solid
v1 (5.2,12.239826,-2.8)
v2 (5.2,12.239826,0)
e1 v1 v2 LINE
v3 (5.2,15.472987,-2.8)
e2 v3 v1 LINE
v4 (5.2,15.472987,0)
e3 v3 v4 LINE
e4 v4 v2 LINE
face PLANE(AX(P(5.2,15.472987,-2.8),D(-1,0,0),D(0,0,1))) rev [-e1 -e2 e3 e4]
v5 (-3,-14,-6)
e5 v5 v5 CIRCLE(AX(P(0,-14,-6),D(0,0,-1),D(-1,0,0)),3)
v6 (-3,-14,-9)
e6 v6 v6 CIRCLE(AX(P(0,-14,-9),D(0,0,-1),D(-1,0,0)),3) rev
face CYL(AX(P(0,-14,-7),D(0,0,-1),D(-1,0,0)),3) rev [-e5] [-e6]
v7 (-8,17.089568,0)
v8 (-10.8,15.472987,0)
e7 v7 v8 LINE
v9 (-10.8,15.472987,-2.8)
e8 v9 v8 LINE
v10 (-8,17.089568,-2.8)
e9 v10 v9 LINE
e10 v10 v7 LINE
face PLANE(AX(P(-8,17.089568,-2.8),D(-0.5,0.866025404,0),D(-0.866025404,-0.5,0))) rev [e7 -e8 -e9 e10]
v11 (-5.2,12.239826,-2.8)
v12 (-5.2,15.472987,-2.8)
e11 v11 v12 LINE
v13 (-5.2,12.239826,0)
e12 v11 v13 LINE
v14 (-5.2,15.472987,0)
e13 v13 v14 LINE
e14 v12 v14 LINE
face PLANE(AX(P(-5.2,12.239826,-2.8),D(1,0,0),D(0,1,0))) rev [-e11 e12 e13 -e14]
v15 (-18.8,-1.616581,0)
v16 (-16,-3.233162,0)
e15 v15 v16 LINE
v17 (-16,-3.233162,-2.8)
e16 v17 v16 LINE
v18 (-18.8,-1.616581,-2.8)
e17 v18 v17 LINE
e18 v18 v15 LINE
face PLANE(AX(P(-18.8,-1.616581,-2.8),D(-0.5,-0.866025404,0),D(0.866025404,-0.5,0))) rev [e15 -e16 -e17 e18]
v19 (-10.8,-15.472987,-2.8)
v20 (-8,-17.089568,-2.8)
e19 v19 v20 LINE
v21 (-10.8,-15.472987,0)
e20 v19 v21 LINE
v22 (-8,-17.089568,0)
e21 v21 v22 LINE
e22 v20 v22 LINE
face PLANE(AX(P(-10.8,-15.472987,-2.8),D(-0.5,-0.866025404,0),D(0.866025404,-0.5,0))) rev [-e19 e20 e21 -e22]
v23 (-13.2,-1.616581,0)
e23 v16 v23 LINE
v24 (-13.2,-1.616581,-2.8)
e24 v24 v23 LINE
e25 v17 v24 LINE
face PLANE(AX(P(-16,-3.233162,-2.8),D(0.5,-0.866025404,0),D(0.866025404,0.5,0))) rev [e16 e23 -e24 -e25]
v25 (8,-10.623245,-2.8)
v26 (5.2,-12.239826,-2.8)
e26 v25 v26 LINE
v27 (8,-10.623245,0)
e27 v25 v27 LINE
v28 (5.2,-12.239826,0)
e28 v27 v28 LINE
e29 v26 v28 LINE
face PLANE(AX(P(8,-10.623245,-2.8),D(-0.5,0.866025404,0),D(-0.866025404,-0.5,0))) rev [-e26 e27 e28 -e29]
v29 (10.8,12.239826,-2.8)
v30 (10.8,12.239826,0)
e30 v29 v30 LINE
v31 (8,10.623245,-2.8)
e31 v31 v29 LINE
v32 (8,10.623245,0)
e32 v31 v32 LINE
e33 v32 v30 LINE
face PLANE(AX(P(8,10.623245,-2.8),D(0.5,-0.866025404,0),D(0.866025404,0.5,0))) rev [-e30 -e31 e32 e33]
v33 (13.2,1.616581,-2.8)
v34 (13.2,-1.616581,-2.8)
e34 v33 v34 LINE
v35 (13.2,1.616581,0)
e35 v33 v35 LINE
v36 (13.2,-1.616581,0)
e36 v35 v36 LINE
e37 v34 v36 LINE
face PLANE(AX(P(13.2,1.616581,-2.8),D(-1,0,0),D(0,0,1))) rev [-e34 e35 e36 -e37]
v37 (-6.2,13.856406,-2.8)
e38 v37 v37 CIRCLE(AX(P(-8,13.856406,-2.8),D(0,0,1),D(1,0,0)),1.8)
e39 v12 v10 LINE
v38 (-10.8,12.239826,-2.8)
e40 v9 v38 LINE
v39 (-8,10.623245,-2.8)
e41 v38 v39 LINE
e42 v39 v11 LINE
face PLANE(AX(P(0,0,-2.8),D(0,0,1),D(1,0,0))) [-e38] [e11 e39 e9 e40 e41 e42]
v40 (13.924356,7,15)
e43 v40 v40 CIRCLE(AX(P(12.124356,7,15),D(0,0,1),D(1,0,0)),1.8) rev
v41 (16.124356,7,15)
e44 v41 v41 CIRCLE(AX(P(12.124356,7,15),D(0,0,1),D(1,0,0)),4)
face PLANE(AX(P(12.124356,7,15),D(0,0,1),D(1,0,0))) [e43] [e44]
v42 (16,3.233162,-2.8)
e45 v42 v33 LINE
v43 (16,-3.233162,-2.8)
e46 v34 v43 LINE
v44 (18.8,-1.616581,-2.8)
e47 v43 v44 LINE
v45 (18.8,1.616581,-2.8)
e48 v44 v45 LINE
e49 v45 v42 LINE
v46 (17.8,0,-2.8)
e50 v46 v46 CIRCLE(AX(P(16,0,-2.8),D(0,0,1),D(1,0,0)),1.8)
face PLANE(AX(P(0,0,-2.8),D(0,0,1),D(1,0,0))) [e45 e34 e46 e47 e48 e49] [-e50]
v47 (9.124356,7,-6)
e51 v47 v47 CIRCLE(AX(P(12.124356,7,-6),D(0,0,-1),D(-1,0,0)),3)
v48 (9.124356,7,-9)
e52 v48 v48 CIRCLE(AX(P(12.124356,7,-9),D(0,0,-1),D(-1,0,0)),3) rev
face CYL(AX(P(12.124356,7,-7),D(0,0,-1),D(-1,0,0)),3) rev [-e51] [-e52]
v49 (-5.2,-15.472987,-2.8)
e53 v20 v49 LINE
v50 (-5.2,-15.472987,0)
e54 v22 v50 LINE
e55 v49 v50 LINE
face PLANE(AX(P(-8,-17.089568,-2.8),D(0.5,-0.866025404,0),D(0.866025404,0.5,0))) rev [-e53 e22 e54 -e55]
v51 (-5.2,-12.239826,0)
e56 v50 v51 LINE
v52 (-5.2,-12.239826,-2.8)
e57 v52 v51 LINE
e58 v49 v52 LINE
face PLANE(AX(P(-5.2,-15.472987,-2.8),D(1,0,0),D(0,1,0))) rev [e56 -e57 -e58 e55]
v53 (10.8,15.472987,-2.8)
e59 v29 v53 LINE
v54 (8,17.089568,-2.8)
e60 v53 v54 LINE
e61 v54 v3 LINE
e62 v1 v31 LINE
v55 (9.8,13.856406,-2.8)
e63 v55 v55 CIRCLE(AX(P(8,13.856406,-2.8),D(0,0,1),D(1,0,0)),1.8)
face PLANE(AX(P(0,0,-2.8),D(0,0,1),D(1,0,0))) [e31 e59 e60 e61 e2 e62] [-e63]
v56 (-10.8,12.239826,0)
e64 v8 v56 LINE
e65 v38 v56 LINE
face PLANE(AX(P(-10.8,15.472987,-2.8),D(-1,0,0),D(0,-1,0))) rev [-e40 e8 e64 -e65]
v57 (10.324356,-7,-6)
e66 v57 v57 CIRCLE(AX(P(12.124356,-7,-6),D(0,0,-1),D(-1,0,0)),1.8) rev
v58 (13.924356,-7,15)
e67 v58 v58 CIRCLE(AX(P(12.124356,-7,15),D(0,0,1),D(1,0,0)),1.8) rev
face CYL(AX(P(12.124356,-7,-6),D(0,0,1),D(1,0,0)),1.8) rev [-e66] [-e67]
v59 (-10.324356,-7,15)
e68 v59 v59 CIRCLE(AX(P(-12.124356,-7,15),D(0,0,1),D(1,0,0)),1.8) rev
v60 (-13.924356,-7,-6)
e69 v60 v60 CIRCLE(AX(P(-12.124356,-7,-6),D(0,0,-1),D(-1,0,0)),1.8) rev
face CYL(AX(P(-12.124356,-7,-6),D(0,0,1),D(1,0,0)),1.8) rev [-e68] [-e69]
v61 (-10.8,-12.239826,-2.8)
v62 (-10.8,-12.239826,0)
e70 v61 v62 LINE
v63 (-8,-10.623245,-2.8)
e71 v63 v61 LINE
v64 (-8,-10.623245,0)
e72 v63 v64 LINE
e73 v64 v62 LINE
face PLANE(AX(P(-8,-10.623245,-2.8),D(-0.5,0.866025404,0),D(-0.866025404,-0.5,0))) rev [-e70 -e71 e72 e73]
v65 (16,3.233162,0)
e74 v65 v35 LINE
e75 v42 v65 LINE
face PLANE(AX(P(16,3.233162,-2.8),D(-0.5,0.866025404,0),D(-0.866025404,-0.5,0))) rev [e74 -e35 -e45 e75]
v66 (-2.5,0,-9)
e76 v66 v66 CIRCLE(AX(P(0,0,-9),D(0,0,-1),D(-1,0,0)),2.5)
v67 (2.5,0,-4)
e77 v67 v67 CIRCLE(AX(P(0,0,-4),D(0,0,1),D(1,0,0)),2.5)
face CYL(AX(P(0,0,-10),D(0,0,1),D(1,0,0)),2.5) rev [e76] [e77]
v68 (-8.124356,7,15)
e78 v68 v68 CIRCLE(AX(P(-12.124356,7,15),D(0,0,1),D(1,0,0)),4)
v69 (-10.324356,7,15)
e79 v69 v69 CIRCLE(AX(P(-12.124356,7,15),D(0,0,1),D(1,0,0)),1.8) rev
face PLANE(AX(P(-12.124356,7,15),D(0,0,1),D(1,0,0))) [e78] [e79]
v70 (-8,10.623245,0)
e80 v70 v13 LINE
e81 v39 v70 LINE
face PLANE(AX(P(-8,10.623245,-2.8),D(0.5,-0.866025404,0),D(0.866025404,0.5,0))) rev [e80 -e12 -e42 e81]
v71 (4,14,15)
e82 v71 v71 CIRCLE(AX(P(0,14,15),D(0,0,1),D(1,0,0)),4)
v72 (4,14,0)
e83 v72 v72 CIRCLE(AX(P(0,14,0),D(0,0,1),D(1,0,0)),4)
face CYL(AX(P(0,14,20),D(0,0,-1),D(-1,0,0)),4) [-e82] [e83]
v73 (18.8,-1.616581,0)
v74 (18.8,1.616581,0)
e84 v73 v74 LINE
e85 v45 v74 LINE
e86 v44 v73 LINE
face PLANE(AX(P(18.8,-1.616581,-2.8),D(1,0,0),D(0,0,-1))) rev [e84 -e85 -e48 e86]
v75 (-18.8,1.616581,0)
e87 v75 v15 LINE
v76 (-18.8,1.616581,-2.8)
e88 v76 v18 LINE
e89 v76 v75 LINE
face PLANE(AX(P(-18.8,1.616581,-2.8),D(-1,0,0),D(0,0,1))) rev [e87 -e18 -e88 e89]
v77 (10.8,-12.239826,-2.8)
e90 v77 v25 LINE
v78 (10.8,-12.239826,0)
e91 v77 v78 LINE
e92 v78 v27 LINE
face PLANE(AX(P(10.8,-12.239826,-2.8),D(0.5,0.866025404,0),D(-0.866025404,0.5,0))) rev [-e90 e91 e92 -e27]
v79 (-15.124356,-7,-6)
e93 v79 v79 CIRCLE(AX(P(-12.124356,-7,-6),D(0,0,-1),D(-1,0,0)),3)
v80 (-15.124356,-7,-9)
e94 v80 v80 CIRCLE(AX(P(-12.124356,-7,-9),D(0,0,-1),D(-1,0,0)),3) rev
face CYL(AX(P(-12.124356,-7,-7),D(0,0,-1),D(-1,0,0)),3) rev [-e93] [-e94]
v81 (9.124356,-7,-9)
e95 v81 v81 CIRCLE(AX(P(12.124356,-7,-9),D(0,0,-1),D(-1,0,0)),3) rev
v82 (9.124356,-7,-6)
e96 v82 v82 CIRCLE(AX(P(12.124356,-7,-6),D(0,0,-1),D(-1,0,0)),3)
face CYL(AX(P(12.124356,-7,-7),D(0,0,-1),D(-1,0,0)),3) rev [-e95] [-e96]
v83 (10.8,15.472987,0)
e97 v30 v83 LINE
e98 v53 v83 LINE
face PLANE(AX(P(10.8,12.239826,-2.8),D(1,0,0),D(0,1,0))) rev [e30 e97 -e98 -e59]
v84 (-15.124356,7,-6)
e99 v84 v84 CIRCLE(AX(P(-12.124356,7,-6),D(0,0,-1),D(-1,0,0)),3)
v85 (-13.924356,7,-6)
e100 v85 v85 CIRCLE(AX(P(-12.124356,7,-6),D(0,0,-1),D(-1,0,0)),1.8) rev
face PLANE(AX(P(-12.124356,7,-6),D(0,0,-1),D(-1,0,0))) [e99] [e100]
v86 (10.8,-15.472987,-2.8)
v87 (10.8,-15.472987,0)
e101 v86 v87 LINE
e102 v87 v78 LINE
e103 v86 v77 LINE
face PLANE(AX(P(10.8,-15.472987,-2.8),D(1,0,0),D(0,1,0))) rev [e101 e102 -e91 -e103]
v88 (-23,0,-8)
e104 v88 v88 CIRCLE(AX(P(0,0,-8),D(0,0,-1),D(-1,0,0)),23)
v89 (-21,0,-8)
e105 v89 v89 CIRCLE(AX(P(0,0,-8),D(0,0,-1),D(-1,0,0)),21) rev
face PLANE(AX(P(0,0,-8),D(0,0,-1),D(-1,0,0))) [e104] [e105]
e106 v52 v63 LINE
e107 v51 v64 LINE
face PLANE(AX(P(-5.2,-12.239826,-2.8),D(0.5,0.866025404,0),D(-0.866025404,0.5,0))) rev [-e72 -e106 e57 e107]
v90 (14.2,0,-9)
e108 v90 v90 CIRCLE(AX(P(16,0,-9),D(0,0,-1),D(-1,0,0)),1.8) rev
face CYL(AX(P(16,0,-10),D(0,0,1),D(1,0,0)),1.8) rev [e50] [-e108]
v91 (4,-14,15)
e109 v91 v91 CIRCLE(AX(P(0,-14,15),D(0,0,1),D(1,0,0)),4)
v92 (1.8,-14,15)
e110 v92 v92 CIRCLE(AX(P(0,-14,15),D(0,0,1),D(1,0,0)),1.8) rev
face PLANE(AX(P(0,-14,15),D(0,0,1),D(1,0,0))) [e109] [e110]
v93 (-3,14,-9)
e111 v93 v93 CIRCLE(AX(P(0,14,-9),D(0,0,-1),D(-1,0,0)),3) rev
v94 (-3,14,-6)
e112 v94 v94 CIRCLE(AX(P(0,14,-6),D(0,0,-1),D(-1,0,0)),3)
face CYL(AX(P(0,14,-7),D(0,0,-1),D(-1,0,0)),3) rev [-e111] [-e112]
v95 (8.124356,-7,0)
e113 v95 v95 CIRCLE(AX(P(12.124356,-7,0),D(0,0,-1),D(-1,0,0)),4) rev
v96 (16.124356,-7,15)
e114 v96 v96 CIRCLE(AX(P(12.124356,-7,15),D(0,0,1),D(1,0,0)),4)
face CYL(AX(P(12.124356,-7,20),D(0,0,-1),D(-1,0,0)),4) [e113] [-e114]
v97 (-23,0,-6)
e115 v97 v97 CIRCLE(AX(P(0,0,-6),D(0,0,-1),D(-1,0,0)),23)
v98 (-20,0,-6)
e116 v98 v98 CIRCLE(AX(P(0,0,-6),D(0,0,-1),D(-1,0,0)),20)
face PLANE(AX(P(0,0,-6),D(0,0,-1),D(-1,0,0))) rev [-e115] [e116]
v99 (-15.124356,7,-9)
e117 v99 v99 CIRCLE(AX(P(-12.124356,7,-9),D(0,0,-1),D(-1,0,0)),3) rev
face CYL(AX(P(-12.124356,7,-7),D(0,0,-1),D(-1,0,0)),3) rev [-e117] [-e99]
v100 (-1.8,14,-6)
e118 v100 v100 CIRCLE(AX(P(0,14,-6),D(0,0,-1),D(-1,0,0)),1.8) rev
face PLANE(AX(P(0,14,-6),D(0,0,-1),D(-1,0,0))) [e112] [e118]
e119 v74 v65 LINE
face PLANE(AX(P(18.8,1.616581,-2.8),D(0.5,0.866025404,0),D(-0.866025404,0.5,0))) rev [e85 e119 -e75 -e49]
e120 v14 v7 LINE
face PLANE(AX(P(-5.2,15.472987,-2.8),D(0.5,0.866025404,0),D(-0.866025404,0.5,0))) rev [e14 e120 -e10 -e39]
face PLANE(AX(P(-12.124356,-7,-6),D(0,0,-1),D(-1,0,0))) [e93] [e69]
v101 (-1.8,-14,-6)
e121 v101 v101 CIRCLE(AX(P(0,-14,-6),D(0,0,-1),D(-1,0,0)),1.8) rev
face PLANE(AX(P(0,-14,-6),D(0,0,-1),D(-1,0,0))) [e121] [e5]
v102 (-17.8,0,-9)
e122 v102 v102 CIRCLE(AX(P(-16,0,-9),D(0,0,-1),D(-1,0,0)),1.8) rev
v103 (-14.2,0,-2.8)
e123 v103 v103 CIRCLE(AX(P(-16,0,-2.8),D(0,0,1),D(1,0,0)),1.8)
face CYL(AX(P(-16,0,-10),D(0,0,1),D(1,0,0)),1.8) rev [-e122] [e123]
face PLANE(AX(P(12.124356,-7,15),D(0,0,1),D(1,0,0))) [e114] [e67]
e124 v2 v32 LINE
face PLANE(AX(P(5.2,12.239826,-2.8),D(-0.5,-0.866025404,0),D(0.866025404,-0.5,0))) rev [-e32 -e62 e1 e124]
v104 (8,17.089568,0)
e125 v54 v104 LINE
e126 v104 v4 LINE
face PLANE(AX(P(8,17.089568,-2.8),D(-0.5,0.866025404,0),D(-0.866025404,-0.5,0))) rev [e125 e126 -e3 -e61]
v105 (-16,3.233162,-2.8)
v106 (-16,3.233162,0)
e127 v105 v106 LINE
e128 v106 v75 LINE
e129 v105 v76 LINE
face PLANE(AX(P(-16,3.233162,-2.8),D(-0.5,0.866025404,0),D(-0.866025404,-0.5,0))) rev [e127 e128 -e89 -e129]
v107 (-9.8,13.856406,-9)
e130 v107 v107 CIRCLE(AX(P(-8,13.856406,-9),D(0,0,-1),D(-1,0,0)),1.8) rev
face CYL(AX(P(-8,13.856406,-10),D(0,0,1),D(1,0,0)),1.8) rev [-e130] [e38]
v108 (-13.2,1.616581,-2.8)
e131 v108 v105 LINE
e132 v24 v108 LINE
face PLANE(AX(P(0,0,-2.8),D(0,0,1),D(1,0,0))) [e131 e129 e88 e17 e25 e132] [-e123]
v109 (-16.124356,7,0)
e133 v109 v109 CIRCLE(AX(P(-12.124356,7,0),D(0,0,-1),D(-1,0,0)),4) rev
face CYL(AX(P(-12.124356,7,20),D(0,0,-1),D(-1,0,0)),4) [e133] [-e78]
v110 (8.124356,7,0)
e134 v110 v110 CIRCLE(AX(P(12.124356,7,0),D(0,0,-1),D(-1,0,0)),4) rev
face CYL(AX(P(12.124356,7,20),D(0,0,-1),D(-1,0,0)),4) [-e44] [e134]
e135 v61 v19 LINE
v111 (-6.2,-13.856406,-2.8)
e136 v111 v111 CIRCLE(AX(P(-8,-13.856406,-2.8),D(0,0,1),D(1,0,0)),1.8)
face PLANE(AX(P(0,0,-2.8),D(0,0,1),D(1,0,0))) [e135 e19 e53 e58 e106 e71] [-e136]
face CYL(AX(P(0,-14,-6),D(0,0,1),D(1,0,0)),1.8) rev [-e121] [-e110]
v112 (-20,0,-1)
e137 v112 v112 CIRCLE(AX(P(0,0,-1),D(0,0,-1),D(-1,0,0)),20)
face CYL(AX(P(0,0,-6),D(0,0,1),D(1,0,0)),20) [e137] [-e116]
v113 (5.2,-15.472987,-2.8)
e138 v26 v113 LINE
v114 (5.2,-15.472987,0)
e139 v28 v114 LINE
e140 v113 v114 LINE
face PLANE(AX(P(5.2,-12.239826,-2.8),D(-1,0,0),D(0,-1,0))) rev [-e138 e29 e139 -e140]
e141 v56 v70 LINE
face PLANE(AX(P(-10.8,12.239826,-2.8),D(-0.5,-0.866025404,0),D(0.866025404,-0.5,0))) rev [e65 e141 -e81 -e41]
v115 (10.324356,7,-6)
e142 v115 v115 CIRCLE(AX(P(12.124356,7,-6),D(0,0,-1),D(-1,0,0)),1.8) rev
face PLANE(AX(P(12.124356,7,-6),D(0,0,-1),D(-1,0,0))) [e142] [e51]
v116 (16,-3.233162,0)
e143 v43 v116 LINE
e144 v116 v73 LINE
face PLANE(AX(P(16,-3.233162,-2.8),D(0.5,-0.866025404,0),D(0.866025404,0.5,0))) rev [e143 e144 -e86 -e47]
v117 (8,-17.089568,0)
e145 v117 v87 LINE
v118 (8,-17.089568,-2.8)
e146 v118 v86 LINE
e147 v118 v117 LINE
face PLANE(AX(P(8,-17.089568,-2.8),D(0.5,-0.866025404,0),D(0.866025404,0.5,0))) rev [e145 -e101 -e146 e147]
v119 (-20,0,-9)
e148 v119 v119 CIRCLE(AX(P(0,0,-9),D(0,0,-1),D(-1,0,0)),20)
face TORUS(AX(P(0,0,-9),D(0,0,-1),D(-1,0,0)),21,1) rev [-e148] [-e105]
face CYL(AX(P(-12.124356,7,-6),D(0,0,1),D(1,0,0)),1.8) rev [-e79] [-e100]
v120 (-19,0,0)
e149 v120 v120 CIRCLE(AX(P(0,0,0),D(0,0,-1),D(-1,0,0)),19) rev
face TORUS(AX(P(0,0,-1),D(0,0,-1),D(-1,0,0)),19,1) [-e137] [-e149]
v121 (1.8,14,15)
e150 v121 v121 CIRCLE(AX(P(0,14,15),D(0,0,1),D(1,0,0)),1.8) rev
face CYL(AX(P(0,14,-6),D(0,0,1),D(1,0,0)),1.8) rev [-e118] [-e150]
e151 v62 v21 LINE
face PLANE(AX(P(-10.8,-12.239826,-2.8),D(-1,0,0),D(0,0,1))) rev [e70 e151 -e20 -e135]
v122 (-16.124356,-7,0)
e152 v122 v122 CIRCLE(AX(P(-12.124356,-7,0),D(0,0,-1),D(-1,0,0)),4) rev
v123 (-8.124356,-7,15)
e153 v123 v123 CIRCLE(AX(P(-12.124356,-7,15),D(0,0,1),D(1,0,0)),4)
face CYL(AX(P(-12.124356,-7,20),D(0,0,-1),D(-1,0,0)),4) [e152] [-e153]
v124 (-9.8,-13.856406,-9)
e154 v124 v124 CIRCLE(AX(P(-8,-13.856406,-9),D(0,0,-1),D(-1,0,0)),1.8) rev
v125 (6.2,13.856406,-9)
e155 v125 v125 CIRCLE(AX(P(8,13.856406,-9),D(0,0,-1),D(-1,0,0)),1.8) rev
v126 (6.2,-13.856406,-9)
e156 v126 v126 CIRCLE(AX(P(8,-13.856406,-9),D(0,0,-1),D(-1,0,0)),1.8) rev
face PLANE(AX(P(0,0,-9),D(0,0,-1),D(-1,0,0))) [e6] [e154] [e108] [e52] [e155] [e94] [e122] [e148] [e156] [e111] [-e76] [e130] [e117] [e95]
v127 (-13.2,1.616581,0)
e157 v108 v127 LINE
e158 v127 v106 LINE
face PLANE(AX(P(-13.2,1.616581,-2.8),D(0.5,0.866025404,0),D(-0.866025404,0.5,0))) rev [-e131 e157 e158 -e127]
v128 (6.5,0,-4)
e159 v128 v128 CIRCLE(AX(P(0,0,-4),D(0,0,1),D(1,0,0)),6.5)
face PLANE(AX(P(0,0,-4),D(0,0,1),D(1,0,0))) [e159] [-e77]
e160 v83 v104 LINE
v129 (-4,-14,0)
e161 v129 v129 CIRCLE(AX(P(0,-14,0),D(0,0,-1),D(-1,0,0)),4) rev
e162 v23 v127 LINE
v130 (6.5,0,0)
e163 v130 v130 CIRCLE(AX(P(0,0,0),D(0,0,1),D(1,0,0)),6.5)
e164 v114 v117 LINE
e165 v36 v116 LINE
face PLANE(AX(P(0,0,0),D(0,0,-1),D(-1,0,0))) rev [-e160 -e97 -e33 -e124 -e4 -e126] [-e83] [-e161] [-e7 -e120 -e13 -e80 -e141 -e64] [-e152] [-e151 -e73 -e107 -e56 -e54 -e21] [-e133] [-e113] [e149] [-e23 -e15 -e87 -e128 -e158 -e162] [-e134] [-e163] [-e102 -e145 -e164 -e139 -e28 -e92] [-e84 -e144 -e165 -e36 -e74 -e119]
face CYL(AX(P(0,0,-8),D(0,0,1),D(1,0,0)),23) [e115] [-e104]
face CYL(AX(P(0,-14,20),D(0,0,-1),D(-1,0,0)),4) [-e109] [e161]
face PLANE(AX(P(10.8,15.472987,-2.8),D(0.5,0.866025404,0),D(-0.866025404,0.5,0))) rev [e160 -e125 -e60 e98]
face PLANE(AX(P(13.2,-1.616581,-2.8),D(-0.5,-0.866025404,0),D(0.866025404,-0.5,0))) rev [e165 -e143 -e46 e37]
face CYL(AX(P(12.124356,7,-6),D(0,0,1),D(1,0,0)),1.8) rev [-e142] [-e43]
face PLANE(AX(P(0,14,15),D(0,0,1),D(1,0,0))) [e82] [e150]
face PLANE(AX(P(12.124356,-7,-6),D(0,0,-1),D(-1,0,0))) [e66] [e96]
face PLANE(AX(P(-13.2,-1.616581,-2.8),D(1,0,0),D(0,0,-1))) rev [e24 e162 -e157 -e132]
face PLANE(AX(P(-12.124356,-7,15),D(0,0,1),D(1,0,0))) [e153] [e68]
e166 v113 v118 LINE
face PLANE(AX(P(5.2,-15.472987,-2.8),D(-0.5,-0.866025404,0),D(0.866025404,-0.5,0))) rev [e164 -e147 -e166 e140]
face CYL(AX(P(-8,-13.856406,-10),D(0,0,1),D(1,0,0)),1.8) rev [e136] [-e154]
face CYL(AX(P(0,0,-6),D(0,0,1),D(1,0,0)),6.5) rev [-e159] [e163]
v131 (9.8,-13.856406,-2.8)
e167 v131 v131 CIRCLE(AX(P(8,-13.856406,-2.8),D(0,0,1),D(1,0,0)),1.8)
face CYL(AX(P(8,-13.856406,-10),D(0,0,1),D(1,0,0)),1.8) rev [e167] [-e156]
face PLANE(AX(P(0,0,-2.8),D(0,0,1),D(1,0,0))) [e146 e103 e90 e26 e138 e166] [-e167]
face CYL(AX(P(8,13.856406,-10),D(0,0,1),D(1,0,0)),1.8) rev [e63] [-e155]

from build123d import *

# Parameters (mm, degrees)
SKETCH_1_R          = 4
EXTRUDE_1_DEPTH     = 20
EXTRUDE_1_2_DEPTH   = 20
EXTRUDE_1_3_DEPTH   = 20
EXTRUDE_1_4_DEPTH   = 20
EXTRUDE_1_5_DEPTH   = 20
EXTRUDE_1_6_DEPTH   = 20
SKETCH_2_R          = 20
EXTRUDE_2_DEPTH     = 6
SKETCH_3_R          = 1.8
CUT_EXTRUDE_1_DEPTH = 39.418745425
SKETCH_4_R          = 6.5
CUT_EXTRUDE_2_DEPTH = 35.641016151
SKETCH_5_R          = 23
SKETCH_5_R_2        = 20
EXTRUDE_3_DEPTH     = 2
CUT_EXTRUDE_START   = -5
SKETCH_7_R          = 4
CUT_EXTRUDE_3_DEPTH = 5
SKETCH_8_R          = 20
SKETCH_8_R_2        = 2.5
SKETCH_8_R_3        = 1.8
EXTRUDE_6_DEPTH     = 4
SKETCH_12_R         = 3
CUT_EXTRUDE_4_DEPTH = 3
CUT_EXTRUDE_5_DEPTH = 2.8
SKETCH_14_R         = 1.8
CUT_EXTRUDE_6_DEPTH = 38.078834933
SKETCH_15_R         = 20
SKETCH_15_R_2       = 2.5
SKETCH_15_R_3       = 3
SKETCH_15_R_4       = 1.8
EXTRUDE_7_DEPTH     = 1
SKETCH_16_R         = 3
SKETCH_16_R_2       = 1.8
EXTRUDE_8_DEPTH     = 1
EXTRUDE_START       = 4
SKETCH_17_R         = 23
SKETCH_17_R_2       = 20
EXTRUDE_9_DEPTH     = 2
CUT_EXTRUDE_START_2 = -2
SKETCH_18_R         = 23
SKETCH_18_R_2       = 20
CUT_EXTRUDE_7_DEPTH = 2
FILLET_3_R          = 1
EXTRUDE_START_2     = 2
SKETCH_19_R         = 6.5
SKETCH_19_R_2       = 2.5
EXTRUDE_10_DEPTH    = 2
SKETCH_21_R         = 20
CUT_EXTRUDE_8_DEPTH = 2
SKETCH_22_R         = 3
CUT_EXTRUDE_9_DEPTH = 2
FILLET_4_R          = 1


with BuildPart() as part:
    # 草图1 → 凸台-拉伸1 (new body)
    with BuildSketch(Plane.XY):
        with Locations((0, 14)):
            Circle(SKETCH_1_R)
    extrude(amount=EXTRUDE_1_DEPTH)



with BuildPart() as body_2:
    # 草图1 → Extrude 1 2 (new body)
    with BuildSketch(Plane.XY):
        with Locations((12.124355653, 7)):
            Circle(SKETCH_1_R)
    extrude(amount=EXTRUDE_1_2_DEPTH)


with BuildPart() as body_3:
    # 草图1 → Extrude 1 3 (new body)
    with BuildSketch(Plane.XY):
        with Locations((12.124355653, -7)):
            Circle(SKETCH_1_R)
    extrude(amount=EXTRUDE_1_3_DEPTH)


with BuildPart() as body_4:
    # 草图1 → Extrude 1 4 (new body)
    with BuildSketch(Plane.XY):
        with Locations((0, -14)):
            Circle(SKETCH_1_R)
    extrude(amount=EXTRUDE_1_4_DEPTH)


with BuildPart() as body_5:
    # 草图1 → Extrude 1 5 (new body)
    with BuildSketch(Plane.XY):
        with Locations((-12.124355653, -7)):
            Circle(SKETCH_1_R)
    extrude(amount=EXTRUDE_1_5_DEPTH)


with BuildPart() as body_6:
    # 草图1 → Extrude 1 6 (new body)
    with BuildSketch(Plane.XY):
        with Locations((-12.124355653, 7)):
            Circle(SKETCH_1_R)
    extrude(amount=EXTRUDE_1_6_DEPTH)


with BuildPart() as part_1:
    add(part.part)

    add(body_2.part)  # 凸台-拉伸2 merges body 2

    add(body_3.part)  # 凸台-拉伸2 merges body 3

    add(body_4.part)  # 凸台-拉伸2 merges body 4

    add(body_5.part)  # 凸台-拉伸2 merges body 5

    add(body_6.part)  # 凸台-拉伸2 merges body 6
    # 草图2 → 凸台-拉伸2 (add)
    with BuildSketch(Plane(origin=(0, 0, 0), x_dir=(-1, 0, 0), z_dir=(0, 0, -1))):
        Circle(SKETCH_2_R)
    extrude(amount=EXTRUDE_2_DEPTH)

    # 草图3 → 切除-拉伸1 (cut, through all)
    with BuildSketch(Plane.XY.offset(20)):
        with Locations((0, 14)):
            Circle(SKETCH_3_R)
        with Locations((12.124355653, 7)):
            Circle(SKETCH_3_R)
        with Locations((12.124355653, -7)):
            Circle(SKETCH_3_R)
        with Locations((0, -14)):
            Circle(SKETCH_3_R)
        with Locations((-12.124355653, -7)):
            Circle(SKETCH_3_R)
        with Locations((-12.124355653, 7)):
            Circle(SKETCH_3_R)
    extrude(amount=-CUT_EXTRUDE_1_DEPTH, mode=Mode.SUBTRACT)

    # 草图4 → 切除-拉伸2 (cut, through all)
    with BuildSketch(Plane.XY):
        Circle(SKETCH_4_R)
    extrude(amount=-CUT_EXTRUDE_2_DEPTH, mode=Mode.SUBTRACT)

    # 草图5 → 凸台-拉伸3 (add)
    with BuildSketch(Plane.XY):
        Circle(SKETCH_5_R)
        Circle(SKETCH_5_R_2, mode=Mode.SUBTRACT)
    extrude(amount=-EXTRUDE_3_DEPTH)

    # 草图7 → 切除-拉伸3 (cut)
    with BuildSketch(Plane.XY.offset(20).offset(CUT_EXTRUDE_START)):
        with Locations(Location((0, -14, 0), (0, 0, 180))):
            Circle(SKETCH_7_R)
        with Locations(Location((-12.124355653, -7, 0), (0, 0, 180))):
            Circle(SKETCH_7_R)
        with Locations(Location((-12.124355653, 7, 0), (0, 0, 180))):
            Circle(SKETCH_7_R)
        with Locations((0, 14)):
            Circle(SKETCH_7_R)
        with Locations(Location((12.124355653, 7, 0), (0, 0, 180))):
            Circle(SKETCH_7_R)
        with Locations(Location((12.124355653, -7, 0), (0, 0, 180))):
            Circle(SKETCH_7_R)
    extrude(amount=CUT_EXTRUDE_3_DEPTH, mode=Mode.SUBTRACT)

    # 草图8 → 凸台-拉伸6 (add)
    with BuildSketch(Plane(origin=(0, 0, -6), x_dir=(-1, 0, 0), z_dir=(0, 0, -1))):
        with Locations(Location((0, 0, 0), (0, 0, 180))):
            Circle(SKETCH_8_R)
        Circle(SKETCH_8_R_2, mode=Mode.SUBTRACT)
        with Locations(Location((12.124355653, 7, 0), (0, 0, 180))):
            Circle(SKETCH_8_R_3, mode=Mode.SUBTRACT)
        with Locations(Location((12.124355653, -7, 0), (0, 0, 180))):
            Circle(SKETCH_8_R_3, mode=Mode.SUBTRACT)
        with Locations(Location((0, -14, 0), (0, 0, 180))):
            Circle(SKETCH_8_R_3, mode=Mode.SUBTRACT)
        with Locations(Location((-12.124355653, -7, 0), (0, 0, 180))):
            Circle(SKETCH_8_R_3, mode=Mode.SUBTRACT)
        with Locations(Location((-12.124355653, 7, 0), (0, 0, 180))):
            Circle(SKETCH_8_R_3, mode=Mode.SUBTRACT)
        with Locations(Location((0, 14, 0), (0, 0, 180))):
            Circle(SKETCH_8_R_3, mode=Mode.SUBTRACT)
    extrude(amount=EXTRUDE_6_DEPTH)

    # 草图12 → 切除-拉伸4 (cut)
    with BuildSketch(Plane(origin=(0, 0, -10), x_dir=(-1, 0, 0), z_dir=(0, 0, -1))):
        with Locations((0, 14)):
            Circle(SKETCH_12_R)
        with Locations((12.124355653, 7)):
            Circle(SKETCH_12_R)
        with Locations((12.124355653, -7)):
            Circle(SKETCH_12_R)
        with Locations((0, -14)):
            Circle(SKETCH_12_R)
        with Locations((-12.124355653, -7)):
            Circle(SKETCH_12_R)
        with Locations((-12.124355653, 7)):
            Circle(SKETCH_12_R)
    extrude(amount=-CUT_EXTRUDE_4_DEPTH, mode=Mode.SUBTRACT)

    # 草图13 → 切除-拉伸5 (cut)
    with BuildSketch(Plane.XY):
        Polygon((16, 3.233161507), (13.2, 1.616580754), (13.2, -1.616580754), (16, -3.233161507), (18.8, -1.616580754), (18.8, 1.616580754), align=None)
        Polygon((10.8, -12.239825707), (8, -10.623244953), (5.2, -12.239825707), (5.2, -15.472987214), (8, -17.089567968), (10.8, -15.472987214), align=None)
        Polygon((-5.2, -15.472987214), (-5.2, -12.239825707), (-8, -10.623244953), (-10.8, -12.239825707), (-10.8, -15.472987214), (-8, -17.089567968), align=None)
        Polygon((-16, -3.233161507), (-13.2, -1.616580754), (-13.2, 1.616580754), (-16, 3.233161507), (-18.8, 1.616580754), (-18.8, -1.616580754), align=None)
        Polygon((-10.8, 12.239825707), (-8, 10.623244953), (-5.2, 12.239825707), (-5.2, 15.472987214), (-8, 17.089567968), (-10.8, 15.472987214), align=None)
        Polygon((5.2, 15.472987214), (5.2, 12.239825707), (8, 10.623244953), (10.8, 12.239825707), (10.8, 15.472987214), (8, 17.089567968), align=None)
    extrude(amount=-CUT_EXTRUDE_5_DEPTH, mode=Mode.SUBTRACT)

    # 草图14 → 切除-拉伸6 (cut, through all)
    with BuildSketch(Plane.XY.offset(-2.8)):
        with Locations((16, 0)):
            Circle(SKETCH_14_R)
        with Locations((8, -13.856406461)):
            Circle(SKETCH_14_R)
        with Locations((-8, -13.856406461)):
            Circle(SKETCH_14_R)
        with Locations((-16, 0)):
            Circle(SKETCH_14_R)
        with Locations((-8, 13.856406461)):
            Circle(SKETCH_14_R)
        with Locations((8, 13.856406461)):
            Circle(SKETCH_14_R)
    extrude(amount=-CUT_EXTRUDE_6_DEPTH, mode=Mode.SUBTRACT)

    # 草图15 → 凸台-拉伸7 (add)
    with BuildSketch(Plane(origin=(0, 0, -10), x_dir=(-1, 0, 0), z_dir=(0, 0, -1))):
        with Locations(Location((0, 0, 0), (0, 0, 180))):
            Circle(SKETCH_15_R)
        Circle(SKETCH_15_R_2, mode=Mode.SUBTRACT)
        with Locations((0, 14)):
            Circle(SKETCH_15_R_3, mode=Mode.SUBTRACT)
        with Locations(Location((-8, 13.856406461, 0), (0, 0, 180))):
            Circle(SKETCH_15_R_4, mode=Mode.SUBTRACT)
        with Locations(Location((8, 13.856406461, 0), (0, 0, 180))):
            Circle(SKETCH_15_R_4, mode=Mode.SUBTRACT)
        with Locations(Location((16, 0, 0), (0, 0, 180))):
            Circle(SKETCH_15_R_4, mode=Mode.SUBTRACT)
        with Locations(Location((8, -13.856406461, 0), (0, 0, 180))):
            Circle(SKETCH_15_R_4, mode=Mode.SUBTRACT)
        with Locations(Location((-8, -13.856406461, 0), (0, 0, 180))):
            Circle(SKETCH_15_R_4, mode=Mode.SUBTRACT)
        with Locations(Location((-16, 0, 0), (0, 0, 180))):
            Circle(SKETCH_15_R_4, mode=Mode.SUBTRACT)
        with Locations((12.124355653, 7)):
            Circle(SKETCH_15_R_3, mode=Mode.SUBTRACT)
        with Locations((12.124355653, -7)):
            Circle(SKETCH_15_R_3, mode=Mode.SUBTRACT)
        with Locations((0, -14)):
            Circle(SKETCH_15_R_3, mode=Mode.SUBTRACT)
        with Locations((-12.124355653, -7)):
            Circle(SKETCH_15_R_3, mode=Mode.SUBTRACT)
        with Locations((-12.124355653, 7)):
            Circle(SKETCH_15_R_3, mode=Mode.SUBTRACT)
    extrude(amount=EXTRUDE_7_DEPTH)

    # 草图16 → 凸台-拉伸8 (add)
    # profile 1 of 6: a face of its own
    with BuildSketch(Plane(origin=(0, 0, -7), x_dir=(-1, 0, 0), z_dir=(0, 0, -1))):
        with Locations((0, -14)):
            Circle(SKETCH_16_R)
        with Locations(Location((0, -14, 0), (0, 0, 180))):
            Circle(SKETCH_16_R_2, mode=Mode.SUBTRACT)
    # profile 2 of 6: a face of its own
    with BuildSketch(Plane(origin=(0, 0, -7), x_dir=(-1, 0, 0), z_dir=(0, 0, -1))):
        with Locations((-12.124355653, -7)):
            Circle(SKETCH_16_R)
        with Locations(Location((-12.124355653, -7, 0), (0, 0, 180))):
            Circle(SKETCH_16_R_2, mode=Mode.SUBTRACT)
    # profile 3 of 6: a face of its own
    with BuildSketch(Plane(origin=(0, 0, -7), x_dir=(-1, 0, 0), z_dir=(0, 0, -1))):
        with Locations((-12.124355653, 7)):
            Circle(SKETCH_16_R)
        with Locations(Location((-12.124355653, 7, 0), (0, 0, 180))):
            Circle(SKETCH_16_R_2, mode=Mode.SUBTRACT)
    # profile 4 of 6: a face of its own
    with BuildSketch(Plane(origin=(0, 0, -7), x_dir=(-1, 0, 0), z_dir=(0, 0, -1))):
        with Locations((0, 14)):
            Circle(SKETCH_16_R)
        with Locations(Location((0, 14, 0), (0, 0, 180))):
            Circle(SKETCH_16_R_2, mode=Mode.SUBTRACT)
    # profile 5 of 6: a face of its own
    with BuildSketch(Plane(origin=(0, 0, -7), x_dir=(-1, 0, 0), z_dir=(0, 0, -1))):
        with Locations((12.124355653, 7)):
            Circle(SKETCH_16_R)
        with Locations(Location((12.124355653, 7, 0), (0, 0, 180))):
            Circle(SKETCH_16_R_2, mode=Mode.SUBTRACT)
    # profile 6 of 6: a face of its own
    with BuildSketch(Plane(origin=(0, 0, -7), x_dir=(-1, 0, 0), z_dir=(0, 0, -1))):
        with Locations((12.124355653, -7)):
            Circle(SKETCH_16_R)
        with Locations(Location((12.124355653, -7, 0), (0, 0, 180))):
            Circle(SKETCH_16_R_2, mode=Mode.SUBTRACT)
    extrude(amount=EXTRUDE_8_DEPTH)

    # 草图17 → 凸台-拉伸9 (add)
    with BuildSketch(Plane(origin=(0, 0, -2), x_dir=(-1, 0, 0), z_dir=(0, 0, -1)).offset(EXTRUDE_START)):
        with Locations(Location((0, 0, 0), (0, 0, 180))):
            Circle(SKETCH_17_R)
        with Locations(Location((0, 0, 0), (0, 0, 180))):
            Circle(SKETCH_17_R_2, mode=Mode.SUBTRACT)
    extrude(amount=EXTRUDE_9_DEPTH)

    # 草图18 → 切除-拉伸7 (cut)
    with BuildSketch(Plane(origin=(0, 0, -2), x_dir=(-1, 0, 0), z_dir=(0, 0, -1)).offset(CUT_EXTRUDE_START_2)):
        Circle(SKETCH_18_R)
        Circle(SKETCH_18_R_2, mode=Mode.SUBTRACT)
    extrude(amount=CUT_EXTRUDE_7_DEPTH, mode=Mode.SUBTRACT)

    # 圆角3
    fillet_3_edges = [part_1.edges().sort_by_distance(p)[0] for p in [
        (20, 0, 0),
    ]]
    fillet(fillet_3_edges, radius=FILLET_3_R)

    # 草图19 → 凸台-拉伸10 (add)
    with BuildSketch(Plane.XY.offset(-6).offset(EXTRUDE_START_2)):
        Circle(SKETCH_19_R)
        Circle(SKETCH_19_R_2, mode=Mode.SUBTRACT)
    extrude(amount=-EXTRUDE_10_DEPTH)

    # 草图21 → 切除-拉伸8 (cut)
    with BuildSketch(Plane(origin=(0, 0, -11), x_dir=(-1, 0, 0), z_dir=(0, 0, -1)).offset(CUT_EXTRUDE_START_2)):
        Circle(SKETCH_21_R)
    extrude(amount=CUT_EXTRUDE_8_DEPTH, mode=Mode.SUBTRACT)

    # 草图22 → 切除-拉伸9 (cut)
    with BuildSketch(Plane(origin=(0, 0, -8), x_dir=(-1, 0, 0), z_dir=(0, 0, -1)).offset(CUT_EXTRUDE_START_2)):
        with Locations((0, 14)):
            Circle(SKETCH_22_R)
        with Locations((-12.124355653, 7)):
            Circle(SKETCH_22_R)
        with Locations((12.124355653, 7)):
            Circle(SKETCH_22_R)
        with Locations((12.124355653, -7)):
            Circle(SKETCH_22_R)
        with Locations((0, -14)):
            Circle(SKETCH_22_R)
        with Locations((-12.124355653, -7)):
            Circle(SKETCH_22_R)
    extrude(amount=CUT_EXTRUDE_9_DEPTH, mode=Mode.SUBTRACT)

    # 圆角4
    fillet_4_edges = [part_1.edges().sort_by_distance(p)[0] for p in [
        (-20, 0, -8),
    ]]
    fillet(fillet_4_edges, radius=FILLET_4_R - 0.0001)  # a hair under: the kernel refuses the full size


solid = part_1.part
